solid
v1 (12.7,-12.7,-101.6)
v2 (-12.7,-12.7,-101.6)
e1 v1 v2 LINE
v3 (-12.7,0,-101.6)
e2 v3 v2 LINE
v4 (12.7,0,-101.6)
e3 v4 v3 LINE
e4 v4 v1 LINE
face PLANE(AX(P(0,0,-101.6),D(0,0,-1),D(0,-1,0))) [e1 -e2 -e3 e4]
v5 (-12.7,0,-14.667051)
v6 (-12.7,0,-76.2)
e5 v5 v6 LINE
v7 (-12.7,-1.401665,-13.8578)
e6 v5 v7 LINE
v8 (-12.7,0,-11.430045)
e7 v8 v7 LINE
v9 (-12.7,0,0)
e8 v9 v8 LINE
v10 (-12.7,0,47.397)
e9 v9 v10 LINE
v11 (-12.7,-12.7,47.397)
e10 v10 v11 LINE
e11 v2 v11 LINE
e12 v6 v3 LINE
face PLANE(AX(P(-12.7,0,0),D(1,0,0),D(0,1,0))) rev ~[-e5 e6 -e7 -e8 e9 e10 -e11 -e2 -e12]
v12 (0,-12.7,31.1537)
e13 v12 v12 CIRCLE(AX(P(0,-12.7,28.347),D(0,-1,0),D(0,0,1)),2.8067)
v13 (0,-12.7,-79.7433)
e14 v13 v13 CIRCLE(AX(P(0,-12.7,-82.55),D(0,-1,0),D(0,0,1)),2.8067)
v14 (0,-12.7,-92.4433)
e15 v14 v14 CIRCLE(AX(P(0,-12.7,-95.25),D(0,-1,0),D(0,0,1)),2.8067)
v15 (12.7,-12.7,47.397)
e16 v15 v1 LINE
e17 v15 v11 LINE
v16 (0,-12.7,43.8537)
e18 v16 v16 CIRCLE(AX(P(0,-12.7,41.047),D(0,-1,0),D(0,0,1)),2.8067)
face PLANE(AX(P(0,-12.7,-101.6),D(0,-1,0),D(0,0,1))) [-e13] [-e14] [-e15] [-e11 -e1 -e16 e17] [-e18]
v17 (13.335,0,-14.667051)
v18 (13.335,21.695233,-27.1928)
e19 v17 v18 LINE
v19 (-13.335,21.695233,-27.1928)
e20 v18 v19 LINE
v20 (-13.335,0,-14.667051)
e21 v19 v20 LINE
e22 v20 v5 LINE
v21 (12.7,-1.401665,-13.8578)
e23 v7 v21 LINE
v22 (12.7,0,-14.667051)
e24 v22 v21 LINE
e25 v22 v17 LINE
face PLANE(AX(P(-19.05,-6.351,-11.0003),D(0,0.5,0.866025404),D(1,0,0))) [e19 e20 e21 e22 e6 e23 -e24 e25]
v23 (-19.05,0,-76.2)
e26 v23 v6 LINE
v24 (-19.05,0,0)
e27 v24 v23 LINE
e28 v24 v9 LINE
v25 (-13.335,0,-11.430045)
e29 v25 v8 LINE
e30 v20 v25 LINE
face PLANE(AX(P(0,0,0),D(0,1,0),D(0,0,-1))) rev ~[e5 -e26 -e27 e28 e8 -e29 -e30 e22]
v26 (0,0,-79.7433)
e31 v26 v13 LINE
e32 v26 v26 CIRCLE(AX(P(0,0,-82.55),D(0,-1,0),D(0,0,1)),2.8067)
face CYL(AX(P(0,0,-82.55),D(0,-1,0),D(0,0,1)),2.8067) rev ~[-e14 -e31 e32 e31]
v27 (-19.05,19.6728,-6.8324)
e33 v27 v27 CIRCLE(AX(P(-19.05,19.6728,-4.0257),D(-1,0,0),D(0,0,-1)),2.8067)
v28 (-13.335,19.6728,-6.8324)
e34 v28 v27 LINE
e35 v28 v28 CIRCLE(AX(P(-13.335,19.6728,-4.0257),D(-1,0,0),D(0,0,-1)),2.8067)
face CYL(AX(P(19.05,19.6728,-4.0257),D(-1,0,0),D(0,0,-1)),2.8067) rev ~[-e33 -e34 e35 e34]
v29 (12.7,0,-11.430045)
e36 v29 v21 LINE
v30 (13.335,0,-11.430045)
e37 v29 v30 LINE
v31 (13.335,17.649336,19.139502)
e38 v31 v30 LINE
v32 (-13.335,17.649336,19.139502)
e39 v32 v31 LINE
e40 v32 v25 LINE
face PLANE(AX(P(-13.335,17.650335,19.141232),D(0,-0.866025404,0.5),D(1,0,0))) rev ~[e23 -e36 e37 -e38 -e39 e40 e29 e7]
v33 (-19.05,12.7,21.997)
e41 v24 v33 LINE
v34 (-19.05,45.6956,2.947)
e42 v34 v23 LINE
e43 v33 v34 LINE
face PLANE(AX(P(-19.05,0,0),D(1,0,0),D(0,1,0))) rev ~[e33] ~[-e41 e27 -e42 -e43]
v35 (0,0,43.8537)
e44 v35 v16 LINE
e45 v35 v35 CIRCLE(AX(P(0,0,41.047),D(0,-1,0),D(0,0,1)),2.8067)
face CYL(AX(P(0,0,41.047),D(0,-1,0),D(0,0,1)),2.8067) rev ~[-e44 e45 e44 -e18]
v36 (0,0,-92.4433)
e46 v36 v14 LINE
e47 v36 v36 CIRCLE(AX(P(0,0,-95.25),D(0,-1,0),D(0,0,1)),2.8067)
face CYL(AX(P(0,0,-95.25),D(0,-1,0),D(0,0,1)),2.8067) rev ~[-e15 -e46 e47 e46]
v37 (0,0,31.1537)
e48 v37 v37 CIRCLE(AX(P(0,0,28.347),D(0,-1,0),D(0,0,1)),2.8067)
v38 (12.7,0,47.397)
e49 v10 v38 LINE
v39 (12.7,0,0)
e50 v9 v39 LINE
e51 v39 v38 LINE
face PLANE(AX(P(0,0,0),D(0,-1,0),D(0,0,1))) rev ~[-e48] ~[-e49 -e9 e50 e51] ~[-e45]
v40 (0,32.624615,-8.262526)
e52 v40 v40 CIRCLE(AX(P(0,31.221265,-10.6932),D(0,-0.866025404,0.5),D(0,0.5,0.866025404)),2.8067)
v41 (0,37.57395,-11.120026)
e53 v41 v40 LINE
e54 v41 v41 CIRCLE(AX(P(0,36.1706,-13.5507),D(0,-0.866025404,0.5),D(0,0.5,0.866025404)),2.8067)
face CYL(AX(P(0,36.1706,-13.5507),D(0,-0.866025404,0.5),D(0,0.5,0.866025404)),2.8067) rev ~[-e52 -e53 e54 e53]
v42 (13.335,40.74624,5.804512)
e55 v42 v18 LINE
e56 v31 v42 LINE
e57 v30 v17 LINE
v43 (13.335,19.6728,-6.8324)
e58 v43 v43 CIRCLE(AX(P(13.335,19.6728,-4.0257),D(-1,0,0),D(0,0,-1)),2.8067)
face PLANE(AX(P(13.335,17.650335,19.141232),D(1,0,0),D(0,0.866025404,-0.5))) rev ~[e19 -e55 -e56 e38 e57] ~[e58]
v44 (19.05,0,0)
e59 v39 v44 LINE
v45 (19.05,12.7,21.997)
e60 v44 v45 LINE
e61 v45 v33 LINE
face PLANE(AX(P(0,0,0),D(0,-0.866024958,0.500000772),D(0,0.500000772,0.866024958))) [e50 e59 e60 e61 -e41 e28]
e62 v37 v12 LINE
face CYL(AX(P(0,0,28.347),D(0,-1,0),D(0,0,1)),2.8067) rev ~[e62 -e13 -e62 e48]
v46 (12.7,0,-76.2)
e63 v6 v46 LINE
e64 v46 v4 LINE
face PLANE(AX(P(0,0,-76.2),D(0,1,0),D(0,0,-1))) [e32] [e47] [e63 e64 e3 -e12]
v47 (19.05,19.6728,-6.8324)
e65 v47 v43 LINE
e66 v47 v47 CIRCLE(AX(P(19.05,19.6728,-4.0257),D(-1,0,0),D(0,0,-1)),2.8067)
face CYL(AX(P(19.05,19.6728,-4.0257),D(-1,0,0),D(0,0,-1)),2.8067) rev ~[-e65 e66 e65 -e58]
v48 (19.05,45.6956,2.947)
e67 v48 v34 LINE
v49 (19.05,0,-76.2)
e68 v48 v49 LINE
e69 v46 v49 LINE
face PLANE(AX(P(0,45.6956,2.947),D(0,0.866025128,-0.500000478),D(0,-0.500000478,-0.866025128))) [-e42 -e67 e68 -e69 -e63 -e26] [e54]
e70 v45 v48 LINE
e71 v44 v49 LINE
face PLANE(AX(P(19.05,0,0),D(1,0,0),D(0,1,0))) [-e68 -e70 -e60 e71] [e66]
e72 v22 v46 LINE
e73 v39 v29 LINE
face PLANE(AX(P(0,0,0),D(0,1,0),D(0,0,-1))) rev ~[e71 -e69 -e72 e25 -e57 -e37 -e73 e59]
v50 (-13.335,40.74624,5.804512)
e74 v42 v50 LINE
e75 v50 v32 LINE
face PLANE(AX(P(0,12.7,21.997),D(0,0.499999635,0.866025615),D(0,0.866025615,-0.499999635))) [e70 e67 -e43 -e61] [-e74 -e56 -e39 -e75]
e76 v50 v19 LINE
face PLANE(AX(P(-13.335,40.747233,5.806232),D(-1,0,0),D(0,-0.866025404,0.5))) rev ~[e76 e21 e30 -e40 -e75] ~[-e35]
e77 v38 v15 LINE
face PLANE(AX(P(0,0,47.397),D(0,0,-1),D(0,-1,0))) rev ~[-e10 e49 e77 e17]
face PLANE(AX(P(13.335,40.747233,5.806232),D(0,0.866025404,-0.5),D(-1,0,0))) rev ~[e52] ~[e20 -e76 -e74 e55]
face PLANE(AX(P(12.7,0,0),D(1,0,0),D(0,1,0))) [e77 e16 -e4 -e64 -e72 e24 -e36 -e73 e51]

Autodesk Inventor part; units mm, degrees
ref_plane "YZ Plane" through (0, 0, 0) normal (1, 0, 0) x (0, 1, 0)
ref_plane "XZ Plane" through (0, 0, 0) normal (0, 1, 0) x (-1, 0, 0)
ref_plane "XY Plane" through (0, 0, 0) normal (0, 0, 1) x (1, 0, 0)
sketch "Sketch1" plane through (0, 0, 0) normal (1, 0, 0) x (0, 1, 0)
  line L0 (0, 0) -> (12.7, 21.997)
  line L1 (0, 0) -> (0, 47.397)
  line L2 (0, 0) -> (0, -101.6)
  line L3 (12.7, 21.997) -> (45.6956, 2.947)
  line L4 (45.6956, 2.947) -> (0, -76.2)
  line L5 (12.7, 21.997) -> (0, 21.997) construction
  line L6 (0, 47.397) -> (-12.7, 47.397)
  line L7 (-12.7, 47.397) -> (-12.7, -76.2)
  line L8 (0, -101.6) -> (-12.7, -101.6)
  line L9 (-12.7, -101.6) -> (-12.7, -76.2)
  dimension "d0" = 38.1
  dimension "d1" = 25.4
  dimension "d6" = 30
  dimension "d7" = 25.4
  dimension "d21" = 25.4
  dimension "d22" = 12.7
extrude "Extrusion2" add sketch "Sketch1" along normal mid plane 38.1 contours L0 L3 L4 L2
extrude "Extrusion3" add sketch "Sketch1" along normal mid plane 25.4
sketch "Sketch2" plane through (-19.05, 12.7, 21.997) normal (0, 0.5, 0.8660254) x (1, 0, 0)
  line L0 (32.385, 5.715) -> (32.385, 32.385)
  line L1 (32.385, 32.385) -> (5.715, 32.385)
  line L2 (5.715, 32.385) -> (5.715, 5.715)
  line L3 (5.715, 5.715) -> (32.385, 5.715)
  line L4 (32.385, 5.715) -> (5.715, 32.385) construction
  line L5 (32.385, 32.385) -> (5.715, 5.715) construction
  line L6 (0, 0) -> (0, 38.1) projected
  line L7 (38.1, 38.1) -> (38.1, 0) projected
  line L8 (0, 38.1) -> (38.1, 38.1) projected
  point P0 (19.05, 0)
  point P1 (19.05, 19.05)
  dimension "d16" = 26.67
  dimension "d17" = 19.05
  dimension "d18" = 19.05
extrude "Extrusion4" cut sketch "Sketch2" against normal blind 38.1
sketch "Sketch3" plane through (-12.7, 0, 47.397) normal (0, 1, 0) x (1, 0, 0)
  point P0 (12.7, 47.397)
sketch "Sketch4" plane through (-12.7, 0, 47.397) normal (0, 1, 0) x (1, 0, 0)
  line L0 (25.4, 0) -> (0, 0) projected
  line L1 (-6.35, 25.4) -> (31.75, 25.4) projected
  line L2 (0, 123.597) -> (25.4, 123.597) projected
  line L3 (25.4, 148.997) -> (0, 148.997) projected
  point P0 (12.7, 47.397)
  point P1 (12.7, 6.35)
  point P2 (12.7, 19.05)
  point P3 (12.7, 129.947)
  point P4 (12.7, 142.647)
  dimension "d23" = 6.35
  dimension "d24" = 6.35
  dimension "d25" = 6.35
  dimension "d26" = 6.35
hole "Hole1" at (0, 0, 41.047) at (0, 0, 28.347) at (0, 0, -82.55) at (0, 0, -95.25) direction (0, -1, 0) diameter 5.6134 end through all clearance for "Flat Head Machine Screw (82)" size "#10" standard "Ansi Unified Screw Threads"
sketch "Sketch5" plane through (19.05, 0, 0) normal (1, 0, 0) x (0, 0, -1)
  line L0 (-21.997, 12.7) -> (-2.947, 45.6956) construction
  line L1 (-12.472, 29.1978) -> (38.1, 0) construction
  line L2 (0, 0) -> (76.2, 0) construction
  line L3 (-21.997, 12.7) -> (0, 0) construction
  point P0 (4.0257, 19.6728)
  dimension "d34" = 19.05
sketch "Sketch6" plane through (-19.05, 45.6956, 2.947) normal (0, 0.8660254, -0.5) x (1, 0, 0)
  line L0 (0, 0) -> (38.1, 0) projected
  point P0 (19.05, 25.4)
  point P1 (19.05, 19.05)
  dimension "d35" = 19.05
hole "Hole2" at (0, 36.1706, -13.5507) direction (0, -0.8660254, 0.5) diameter 5.6134 depth 5.715 clearance for "Flat Head Machine Screw (82)" size "#10" standard "Ansi Unified Screw Threads"
hole "Hole3" at (19.05, 19.6728, -4.0257) direction (-1, 0, 0) diameter 5.6134 end through all clearance for "Flat Head Machine Screw (82)" size "#10" standard "Ansi Unified Screw Threads"
properties part number "60degreeAttachement" material "PBT Plastic"
